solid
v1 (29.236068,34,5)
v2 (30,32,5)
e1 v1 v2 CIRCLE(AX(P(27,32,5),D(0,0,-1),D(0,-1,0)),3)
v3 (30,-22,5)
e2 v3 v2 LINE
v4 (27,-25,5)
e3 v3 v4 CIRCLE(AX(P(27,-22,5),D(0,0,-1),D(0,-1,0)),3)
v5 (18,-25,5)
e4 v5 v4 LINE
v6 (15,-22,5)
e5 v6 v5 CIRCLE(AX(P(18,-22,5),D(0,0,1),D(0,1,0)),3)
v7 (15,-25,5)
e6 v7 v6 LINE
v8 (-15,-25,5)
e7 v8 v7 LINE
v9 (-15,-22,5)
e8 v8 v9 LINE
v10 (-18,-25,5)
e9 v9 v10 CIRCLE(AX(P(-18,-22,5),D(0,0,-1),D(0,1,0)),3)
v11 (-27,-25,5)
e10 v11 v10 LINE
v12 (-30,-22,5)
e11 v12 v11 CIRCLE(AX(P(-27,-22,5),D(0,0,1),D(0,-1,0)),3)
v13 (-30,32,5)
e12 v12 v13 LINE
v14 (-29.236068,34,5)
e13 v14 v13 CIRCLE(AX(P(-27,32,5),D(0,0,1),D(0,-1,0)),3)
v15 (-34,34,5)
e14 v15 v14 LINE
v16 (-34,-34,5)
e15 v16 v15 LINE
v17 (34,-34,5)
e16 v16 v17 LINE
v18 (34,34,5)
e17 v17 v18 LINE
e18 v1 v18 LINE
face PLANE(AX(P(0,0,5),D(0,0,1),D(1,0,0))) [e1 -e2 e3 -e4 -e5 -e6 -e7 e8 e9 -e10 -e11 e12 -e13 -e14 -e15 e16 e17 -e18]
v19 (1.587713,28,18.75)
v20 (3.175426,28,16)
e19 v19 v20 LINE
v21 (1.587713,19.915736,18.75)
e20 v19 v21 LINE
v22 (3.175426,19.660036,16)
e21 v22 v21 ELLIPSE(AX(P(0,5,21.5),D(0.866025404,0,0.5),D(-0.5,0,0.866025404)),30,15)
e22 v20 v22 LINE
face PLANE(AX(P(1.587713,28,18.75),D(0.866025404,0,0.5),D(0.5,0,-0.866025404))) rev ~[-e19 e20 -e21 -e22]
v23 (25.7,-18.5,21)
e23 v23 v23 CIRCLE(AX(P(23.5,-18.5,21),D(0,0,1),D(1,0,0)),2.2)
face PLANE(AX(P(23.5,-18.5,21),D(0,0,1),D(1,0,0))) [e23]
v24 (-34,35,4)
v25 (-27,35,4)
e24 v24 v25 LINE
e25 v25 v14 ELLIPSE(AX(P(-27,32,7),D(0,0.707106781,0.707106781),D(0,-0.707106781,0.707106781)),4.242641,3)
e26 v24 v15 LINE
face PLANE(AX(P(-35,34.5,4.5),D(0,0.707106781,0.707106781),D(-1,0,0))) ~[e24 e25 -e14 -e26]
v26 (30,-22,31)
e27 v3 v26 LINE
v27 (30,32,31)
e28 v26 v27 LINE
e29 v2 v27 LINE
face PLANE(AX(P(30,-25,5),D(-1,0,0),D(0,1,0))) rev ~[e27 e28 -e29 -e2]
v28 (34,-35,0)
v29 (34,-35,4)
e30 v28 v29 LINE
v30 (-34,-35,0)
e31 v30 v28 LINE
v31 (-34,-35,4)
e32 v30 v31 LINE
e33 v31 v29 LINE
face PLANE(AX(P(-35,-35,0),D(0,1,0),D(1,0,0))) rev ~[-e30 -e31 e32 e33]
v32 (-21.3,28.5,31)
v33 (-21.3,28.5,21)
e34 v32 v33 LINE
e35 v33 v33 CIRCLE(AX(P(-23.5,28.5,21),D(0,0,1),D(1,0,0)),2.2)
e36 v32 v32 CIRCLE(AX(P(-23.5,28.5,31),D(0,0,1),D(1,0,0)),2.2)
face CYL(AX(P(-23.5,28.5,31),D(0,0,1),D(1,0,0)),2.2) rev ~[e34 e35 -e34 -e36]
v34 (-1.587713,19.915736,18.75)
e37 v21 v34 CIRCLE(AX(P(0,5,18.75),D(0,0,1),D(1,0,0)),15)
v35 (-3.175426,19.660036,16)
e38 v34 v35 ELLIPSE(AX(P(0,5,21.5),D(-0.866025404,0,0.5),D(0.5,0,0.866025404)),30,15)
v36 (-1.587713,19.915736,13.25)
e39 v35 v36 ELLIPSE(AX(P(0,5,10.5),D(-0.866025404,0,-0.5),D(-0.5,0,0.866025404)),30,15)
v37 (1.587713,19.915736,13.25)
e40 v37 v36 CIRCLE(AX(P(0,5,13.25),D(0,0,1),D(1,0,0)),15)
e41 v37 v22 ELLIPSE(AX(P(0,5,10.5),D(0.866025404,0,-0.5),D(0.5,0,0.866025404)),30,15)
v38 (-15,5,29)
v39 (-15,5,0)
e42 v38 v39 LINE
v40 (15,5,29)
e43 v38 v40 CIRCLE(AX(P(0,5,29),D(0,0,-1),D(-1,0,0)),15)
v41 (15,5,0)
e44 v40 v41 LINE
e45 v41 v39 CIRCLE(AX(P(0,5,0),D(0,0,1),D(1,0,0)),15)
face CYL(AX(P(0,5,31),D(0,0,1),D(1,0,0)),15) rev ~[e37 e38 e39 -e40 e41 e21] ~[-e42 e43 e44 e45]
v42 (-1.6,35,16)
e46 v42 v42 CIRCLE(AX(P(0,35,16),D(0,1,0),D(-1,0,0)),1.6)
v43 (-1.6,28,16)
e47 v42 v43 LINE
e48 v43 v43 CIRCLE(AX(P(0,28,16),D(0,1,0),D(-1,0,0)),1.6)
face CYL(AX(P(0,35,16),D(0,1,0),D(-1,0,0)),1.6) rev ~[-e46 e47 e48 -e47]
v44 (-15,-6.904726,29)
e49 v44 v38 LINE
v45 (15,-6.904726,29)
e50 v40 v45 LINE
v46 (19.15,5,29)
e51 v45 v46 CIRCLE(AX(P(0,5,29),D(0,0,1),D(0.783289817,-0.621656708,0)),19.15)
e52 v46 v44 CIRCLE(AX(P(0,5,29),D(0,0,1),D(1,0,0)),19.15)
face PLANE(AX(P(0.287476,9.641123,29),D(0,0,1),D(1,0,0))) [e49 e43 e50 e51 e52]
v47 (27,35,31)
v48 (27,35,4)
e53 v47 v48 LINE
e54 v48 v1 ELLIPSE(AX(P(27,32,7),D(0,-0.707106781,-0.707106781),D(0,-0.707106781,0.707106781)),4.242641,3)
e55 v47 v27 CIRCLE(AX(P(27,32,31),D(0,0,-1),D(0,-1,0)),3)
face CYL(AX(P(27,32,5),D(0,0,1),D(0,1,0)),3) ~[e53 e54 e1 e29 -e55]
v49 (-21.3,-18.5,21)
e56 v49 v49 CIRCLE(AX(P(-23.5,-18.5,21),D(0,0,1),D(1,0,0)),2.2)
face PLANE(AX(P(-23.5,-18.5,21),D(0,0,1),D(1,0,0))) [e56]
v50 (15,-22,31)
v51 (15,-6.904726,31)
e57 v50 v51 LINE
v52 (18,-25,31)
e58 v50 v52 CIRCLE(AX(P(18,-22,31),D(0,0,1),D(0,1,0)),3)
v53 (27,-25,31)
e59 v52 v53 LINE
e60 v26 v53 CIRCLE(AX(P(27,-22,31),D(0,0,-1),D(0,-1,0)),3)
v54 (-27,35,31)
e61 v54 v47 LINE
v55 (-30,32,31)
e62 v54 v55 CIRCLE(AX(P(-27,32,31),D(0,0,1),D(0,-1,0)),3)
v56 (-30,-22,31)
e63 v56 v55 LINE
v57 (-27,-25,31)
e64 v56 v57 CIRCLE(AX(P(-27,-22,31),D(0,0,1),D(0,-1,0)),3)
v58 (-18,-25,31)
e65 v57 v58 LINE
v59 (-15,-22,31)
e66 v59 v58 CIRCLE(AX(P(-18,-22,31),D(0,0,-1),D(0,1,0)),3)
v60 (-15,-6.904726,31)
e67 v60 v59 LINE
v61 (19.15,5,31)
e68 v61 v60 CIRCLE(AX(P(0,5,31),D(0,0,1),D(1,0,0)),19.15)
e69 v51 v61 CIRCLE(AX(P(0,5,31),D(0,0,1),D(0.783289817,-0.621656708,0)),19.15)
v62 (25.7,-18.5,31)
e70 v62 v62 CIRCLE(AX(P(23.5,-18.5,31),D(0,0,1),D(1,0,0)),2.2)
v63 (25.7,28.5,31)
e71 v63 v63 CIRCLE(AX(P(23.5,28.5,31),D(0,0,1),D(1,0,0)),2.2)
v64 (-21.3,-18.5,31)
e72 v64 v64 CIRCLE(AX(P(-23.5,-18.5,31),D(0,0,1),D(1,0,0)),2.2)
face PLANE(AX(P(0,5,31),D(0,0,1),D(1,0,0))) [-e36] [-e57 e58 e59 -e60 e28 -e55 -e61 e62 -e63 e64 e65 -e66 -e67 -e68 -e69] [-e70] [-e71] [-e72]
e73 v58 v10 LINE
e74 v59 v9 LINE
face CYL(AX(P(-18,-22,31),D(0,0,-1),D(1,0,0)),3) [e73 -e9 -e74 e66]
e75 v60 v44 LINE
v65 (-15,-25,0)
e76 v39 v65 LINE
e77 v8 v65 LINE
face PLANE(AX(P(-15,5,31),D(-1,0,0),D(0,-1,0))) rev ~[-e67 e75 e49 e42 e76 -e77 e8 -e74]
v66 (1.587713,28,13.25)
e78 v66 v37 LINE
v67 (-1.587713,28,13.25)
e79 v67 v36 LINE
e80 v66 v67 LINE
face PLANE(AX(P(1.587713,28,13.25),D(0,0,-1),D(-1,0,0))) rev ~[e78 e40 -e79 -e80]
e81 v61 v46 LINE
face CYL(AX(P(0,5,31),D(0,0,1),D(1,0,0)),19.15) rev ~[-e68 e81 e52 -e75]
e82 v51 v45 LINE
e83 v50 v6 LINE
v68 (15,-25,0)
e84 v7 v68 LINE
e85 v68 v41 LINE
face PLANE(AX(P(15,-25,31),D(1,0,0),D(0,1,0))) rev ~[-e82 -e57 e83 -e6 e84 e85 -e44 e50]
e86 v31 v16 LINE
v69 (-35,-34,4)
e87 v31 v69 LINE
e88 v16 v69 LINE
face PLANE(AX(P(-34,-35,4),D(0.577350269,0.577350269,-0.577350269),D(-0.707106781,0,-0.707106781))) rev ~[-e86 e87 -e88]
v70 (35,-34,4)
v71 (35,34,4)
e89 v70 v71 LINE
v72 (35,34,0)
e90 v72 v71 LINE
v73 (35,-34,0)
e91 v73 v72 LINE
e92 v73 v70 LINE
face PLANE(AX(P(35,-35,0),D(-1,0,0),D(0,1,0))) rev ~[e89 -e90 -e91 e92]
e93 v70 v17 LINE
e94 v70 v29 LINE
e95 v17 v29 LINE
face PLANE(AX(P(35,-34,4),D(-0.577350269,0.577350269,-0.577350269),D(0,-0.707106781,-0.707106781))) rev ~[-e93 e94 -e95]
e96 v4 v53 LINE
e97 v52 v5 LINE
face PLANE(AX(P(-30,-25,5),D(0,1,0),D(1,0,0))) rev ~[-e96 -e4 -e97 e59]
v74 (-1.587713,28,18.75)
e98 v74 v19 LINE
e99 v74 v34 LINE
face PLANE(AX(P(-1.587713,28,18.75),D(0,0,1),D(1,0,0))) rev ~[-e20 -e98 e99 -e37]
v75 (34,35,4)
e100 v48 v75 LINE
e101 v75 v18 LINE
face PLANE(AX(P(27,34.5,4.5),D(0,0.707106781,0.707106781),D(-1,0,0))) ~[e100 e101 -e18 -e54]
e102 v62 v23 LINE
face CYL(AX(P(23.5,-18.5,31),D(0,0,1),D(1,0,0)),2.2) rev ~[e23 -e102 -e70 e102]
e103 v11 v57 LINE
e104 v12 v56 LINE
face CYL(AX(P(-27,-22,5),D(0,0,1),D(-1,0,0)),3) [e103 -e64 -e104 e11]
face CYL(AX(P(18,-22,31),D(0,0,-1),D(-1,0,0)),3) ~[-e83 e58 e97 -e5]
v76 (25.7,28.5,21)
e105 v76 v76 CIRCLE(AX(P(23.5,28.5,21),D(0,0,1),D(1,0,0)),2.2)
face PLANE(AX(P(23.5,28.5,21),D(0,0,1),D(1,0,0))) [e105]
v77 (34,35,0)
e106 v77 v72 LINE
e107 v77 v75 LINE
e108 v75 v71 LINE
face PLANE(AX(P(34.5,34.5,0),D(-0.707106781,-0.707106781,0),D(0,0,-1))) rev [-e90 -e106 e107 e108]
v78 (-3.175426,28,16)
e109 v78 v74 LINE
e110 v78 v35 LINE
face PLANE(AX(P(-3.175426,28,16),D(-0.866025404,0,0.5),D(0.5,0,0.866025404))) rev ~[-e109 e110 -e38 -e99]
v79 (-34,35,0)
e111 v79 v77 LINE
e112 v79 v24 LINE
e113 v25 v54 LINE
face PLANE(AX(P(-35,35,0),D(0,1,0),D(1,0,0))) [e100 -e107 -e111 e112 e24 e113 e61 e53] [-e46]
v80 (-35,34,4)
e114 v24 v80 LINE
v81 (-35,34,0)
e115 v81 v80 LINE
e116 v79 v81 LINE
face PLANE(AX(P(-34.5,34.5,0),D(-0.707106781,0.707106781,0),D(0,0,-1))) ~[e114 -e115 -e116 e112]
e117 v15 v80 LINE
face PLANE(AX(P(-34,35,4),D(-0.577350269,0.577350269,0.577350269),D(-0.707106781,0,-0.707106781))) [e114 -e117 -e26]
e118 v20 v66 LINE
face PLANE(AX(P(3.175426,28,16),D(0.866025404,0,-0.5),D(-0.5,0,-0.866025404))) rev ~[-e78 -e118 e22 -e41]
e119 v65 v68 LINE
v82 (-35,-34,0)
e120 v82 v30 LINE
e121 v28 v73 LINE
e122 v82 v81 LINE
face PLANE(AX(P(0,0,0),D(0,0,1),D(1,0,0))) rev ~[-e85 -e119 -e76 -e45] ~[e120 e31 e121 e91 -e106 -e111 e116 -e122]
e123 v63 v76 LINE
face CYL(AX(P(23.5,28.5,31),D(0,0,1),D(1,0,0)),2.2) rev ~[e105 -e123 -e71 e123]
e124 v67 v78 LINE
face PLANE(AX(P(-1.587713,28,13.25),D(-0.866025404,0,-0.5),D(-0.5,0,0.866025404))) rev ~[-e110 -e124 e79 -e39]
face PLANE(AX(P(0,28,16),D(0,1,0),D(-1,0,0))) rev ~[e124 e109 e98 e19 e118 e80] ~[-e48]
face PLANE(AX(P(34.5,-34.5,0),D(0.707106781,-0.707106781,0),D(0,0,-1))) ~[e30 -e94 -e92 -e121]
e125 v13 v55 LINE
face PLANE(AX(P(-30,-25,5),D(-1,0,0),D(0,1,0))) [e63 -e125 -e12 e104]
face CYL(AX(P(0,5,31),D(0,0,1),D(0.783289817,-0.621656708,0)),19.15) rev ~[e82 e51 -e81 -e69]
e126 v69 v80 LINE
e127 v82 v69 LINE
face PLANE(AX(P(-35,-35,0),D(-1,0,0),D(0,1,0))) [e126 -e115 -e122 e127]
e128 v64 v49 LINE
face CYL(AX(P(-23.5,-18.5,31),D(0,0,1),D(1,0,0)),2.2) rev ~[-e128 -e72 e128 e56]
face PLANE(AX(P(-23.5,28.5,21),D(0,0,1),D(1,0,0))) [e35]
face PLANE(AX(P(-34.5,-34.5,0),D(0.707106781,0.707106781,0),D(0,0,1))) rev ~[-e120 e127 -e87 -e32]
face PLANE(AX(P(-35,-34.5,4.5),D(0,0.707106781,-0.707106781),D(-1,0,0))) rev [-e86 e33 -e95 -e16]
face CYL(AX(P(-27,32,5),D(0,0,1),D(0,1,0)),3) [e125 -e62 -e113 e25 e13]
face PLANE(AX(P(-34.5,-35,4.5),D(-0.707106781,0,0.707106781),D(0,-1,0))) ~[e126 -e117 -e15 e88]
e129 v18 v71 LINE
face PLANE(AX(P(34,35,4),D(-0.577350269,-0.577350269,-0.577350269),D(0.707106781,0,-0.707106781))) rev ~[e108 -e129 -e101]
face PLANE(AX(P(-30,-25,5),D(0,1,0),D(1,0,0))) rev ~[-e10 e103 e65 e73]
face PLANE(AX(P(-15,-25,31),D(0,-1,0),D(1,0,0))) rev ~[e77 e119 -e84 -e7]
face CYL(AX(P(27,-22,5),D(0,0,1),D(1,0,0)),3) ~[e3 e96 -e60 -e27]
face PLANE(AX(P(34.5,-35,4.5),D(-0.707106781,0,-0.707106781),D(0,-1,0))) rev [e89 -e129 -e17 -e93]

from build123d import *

# Parameters (mm, degrees)
F0_W      = 70
F0_H      = 70
F1_DEPTH  = 5
F2_W      = 60
F2_H      = 60
F3_DEPTH  = 26
F4_R      = 2.2
F5_DEPTH  = 10
F6_DEPTH  = 31.001
F7_DEPTH  = 2
F8_R      = 1.6
F9_DEPTH  = 70.001
F10_START = -7
F10_DEPTH = 18
F11_R     = 3
F12_SIZE  = 1


with BuildPart() as f1:
    # F0 (on Top) → F1 (new body)
    with BuildSketch(Plane.XY):
        Rectangle(F0_W, F0_H)
    extrude(amount=F1_DEPTH)

    # F2 (on face) → F3 (join)
    with BuildSketch(Plane.XY.offset(5)):
        with Locations((0, 5)):
            Rectangle(F2_W, F2_H)
    extrude(amount=F3_DEPTH)

    # F4 (on face) → F5 (cut)
    with BuildSketch(Plane.XY.offset(31)):
        with Locations((-23.5, -18.5)):
            Circle(F4_R)
        with Locations((-23.5, 28.5)):
            Circle(F4_R)
        with Locations((23.5, 28.5)):
            Circle(F4_R)
        with Locations((23.5, -18.5)):
            Circle(F4_R)
    extrude(amount=-F5_DEPTH, mode=Mode.SUBTRACT)

    # F4 (on face) → F6 (cut, through all)
    with BuildSketch(Plane.XY.offset(31)):
        with BuildLine():
            ThreePointArc((-15, 5), (0, -10), (15, 5))
            ThreePointArc((15, 5), (0, 20), (-15, 5))
        make_face()
        with BuildLine():
            Line((15, -6.9047259523), (15, 5))
            ThreePointArc((15, 5), (0, -10), (-15, 5))
            Line((-15, 5), (-15, -6.9047259523))
            ThreePointArc((-15, -6.9047259523), (0, -14.15), (15, -6.9047259523))
        make_face()
        with BuildLine():
            Line((15, -25), (15, -6.9047259523))
            ThreePointArc((15, -6.9047259523), (0, -14.15), (-15, -6.9047259523))
            Line((-15, -6.9047259523), (-15, -25))
            Line((-15, -25), (15, -25))
        make_face()
    extrude(amount=-F6_DEPTH, mode=Mode.SUBTRACT)

    # F4 (on face) → F7 (cut)
    with BuildSketch(Plane.XY.offset(31)):
        with BuildLine():
            ThreePointArc((-15, 5), (0, 20), (15, 5))
            Line((15, 5), (15, -6.9047259523))
            ThreePointArc((15, -6.9047259523), (18.0827611277, -1.3036695662), (19.15, 5))
            ThreePointArc((19.15, 5), (-6.3036695662, 23.0827611277), (-15, -6.9047259523))
            Line((-15, -6.9047259523), (-15, 5))
        make_face()
    extrude(amount=-F7_DEPTH, mode=Mode.SUBTRACT)

    # F8 (on face) → F9 (cut, through all)
    with BuildSketch(Plane(origin=(0, 35, 0), x_dir=(-1, 0, 0), z_dir=(0, 1, 0))):
        with Locations((0, 16)):
            Circle(F8_R)
    extrude(amount=-F9_DEPTH, mode=Mode.SUBTRACT)

    # F8 (on face) → F10 (cut)
    with BuildSketch(Plane(origin=(0, 35, 0), x_dir=(-1, 0, 0), z_dir=(0, 1, 0)).offset(F10_START)):
        Polygon((3.1754264805, 16), (1.5877132403, 18.75), (-1.5877132403, 18.75), (-3.1754264805, 16), (-1.5877132403, 13.25), (1.5877132403, 13.25), align=None)
        with Locations((0, 16)):
            Circle(F8_R, mode=Mode.SUBTRACT)
    extrude(amount=-F10_DEPTH, mode=Mode.SUBTRACT)

    # F11
    f11_edges = [f1.edges().sort_by_distance(p)[0] for p in [
        (30, -25, 18),
        (-30, -25, 18),
        (30, 35, 18),
        (-30, 35, 18),
        (-15, -25, 18),
        (15, -25, 18),
    ]]
    fillet(f11_edges, radius=F11_R)

    # F12
    f12_edges = [f1.edges().sort_by_distance(p)[0] for p in [
        (-35, 0, 5),
        (0, -35, 5),
        (35, 0, 5),
        (32.5, 35, 5),
        (-32.5, 35, 5),
        (35, -35, 2.5),
        (-35, -35, 2.5),
        (-35, 35, 2.5),
        (35, 35, 2.5),
    ]]
    chamfer(f12_edges, length=F12_SIZE)


solid = f1.part
